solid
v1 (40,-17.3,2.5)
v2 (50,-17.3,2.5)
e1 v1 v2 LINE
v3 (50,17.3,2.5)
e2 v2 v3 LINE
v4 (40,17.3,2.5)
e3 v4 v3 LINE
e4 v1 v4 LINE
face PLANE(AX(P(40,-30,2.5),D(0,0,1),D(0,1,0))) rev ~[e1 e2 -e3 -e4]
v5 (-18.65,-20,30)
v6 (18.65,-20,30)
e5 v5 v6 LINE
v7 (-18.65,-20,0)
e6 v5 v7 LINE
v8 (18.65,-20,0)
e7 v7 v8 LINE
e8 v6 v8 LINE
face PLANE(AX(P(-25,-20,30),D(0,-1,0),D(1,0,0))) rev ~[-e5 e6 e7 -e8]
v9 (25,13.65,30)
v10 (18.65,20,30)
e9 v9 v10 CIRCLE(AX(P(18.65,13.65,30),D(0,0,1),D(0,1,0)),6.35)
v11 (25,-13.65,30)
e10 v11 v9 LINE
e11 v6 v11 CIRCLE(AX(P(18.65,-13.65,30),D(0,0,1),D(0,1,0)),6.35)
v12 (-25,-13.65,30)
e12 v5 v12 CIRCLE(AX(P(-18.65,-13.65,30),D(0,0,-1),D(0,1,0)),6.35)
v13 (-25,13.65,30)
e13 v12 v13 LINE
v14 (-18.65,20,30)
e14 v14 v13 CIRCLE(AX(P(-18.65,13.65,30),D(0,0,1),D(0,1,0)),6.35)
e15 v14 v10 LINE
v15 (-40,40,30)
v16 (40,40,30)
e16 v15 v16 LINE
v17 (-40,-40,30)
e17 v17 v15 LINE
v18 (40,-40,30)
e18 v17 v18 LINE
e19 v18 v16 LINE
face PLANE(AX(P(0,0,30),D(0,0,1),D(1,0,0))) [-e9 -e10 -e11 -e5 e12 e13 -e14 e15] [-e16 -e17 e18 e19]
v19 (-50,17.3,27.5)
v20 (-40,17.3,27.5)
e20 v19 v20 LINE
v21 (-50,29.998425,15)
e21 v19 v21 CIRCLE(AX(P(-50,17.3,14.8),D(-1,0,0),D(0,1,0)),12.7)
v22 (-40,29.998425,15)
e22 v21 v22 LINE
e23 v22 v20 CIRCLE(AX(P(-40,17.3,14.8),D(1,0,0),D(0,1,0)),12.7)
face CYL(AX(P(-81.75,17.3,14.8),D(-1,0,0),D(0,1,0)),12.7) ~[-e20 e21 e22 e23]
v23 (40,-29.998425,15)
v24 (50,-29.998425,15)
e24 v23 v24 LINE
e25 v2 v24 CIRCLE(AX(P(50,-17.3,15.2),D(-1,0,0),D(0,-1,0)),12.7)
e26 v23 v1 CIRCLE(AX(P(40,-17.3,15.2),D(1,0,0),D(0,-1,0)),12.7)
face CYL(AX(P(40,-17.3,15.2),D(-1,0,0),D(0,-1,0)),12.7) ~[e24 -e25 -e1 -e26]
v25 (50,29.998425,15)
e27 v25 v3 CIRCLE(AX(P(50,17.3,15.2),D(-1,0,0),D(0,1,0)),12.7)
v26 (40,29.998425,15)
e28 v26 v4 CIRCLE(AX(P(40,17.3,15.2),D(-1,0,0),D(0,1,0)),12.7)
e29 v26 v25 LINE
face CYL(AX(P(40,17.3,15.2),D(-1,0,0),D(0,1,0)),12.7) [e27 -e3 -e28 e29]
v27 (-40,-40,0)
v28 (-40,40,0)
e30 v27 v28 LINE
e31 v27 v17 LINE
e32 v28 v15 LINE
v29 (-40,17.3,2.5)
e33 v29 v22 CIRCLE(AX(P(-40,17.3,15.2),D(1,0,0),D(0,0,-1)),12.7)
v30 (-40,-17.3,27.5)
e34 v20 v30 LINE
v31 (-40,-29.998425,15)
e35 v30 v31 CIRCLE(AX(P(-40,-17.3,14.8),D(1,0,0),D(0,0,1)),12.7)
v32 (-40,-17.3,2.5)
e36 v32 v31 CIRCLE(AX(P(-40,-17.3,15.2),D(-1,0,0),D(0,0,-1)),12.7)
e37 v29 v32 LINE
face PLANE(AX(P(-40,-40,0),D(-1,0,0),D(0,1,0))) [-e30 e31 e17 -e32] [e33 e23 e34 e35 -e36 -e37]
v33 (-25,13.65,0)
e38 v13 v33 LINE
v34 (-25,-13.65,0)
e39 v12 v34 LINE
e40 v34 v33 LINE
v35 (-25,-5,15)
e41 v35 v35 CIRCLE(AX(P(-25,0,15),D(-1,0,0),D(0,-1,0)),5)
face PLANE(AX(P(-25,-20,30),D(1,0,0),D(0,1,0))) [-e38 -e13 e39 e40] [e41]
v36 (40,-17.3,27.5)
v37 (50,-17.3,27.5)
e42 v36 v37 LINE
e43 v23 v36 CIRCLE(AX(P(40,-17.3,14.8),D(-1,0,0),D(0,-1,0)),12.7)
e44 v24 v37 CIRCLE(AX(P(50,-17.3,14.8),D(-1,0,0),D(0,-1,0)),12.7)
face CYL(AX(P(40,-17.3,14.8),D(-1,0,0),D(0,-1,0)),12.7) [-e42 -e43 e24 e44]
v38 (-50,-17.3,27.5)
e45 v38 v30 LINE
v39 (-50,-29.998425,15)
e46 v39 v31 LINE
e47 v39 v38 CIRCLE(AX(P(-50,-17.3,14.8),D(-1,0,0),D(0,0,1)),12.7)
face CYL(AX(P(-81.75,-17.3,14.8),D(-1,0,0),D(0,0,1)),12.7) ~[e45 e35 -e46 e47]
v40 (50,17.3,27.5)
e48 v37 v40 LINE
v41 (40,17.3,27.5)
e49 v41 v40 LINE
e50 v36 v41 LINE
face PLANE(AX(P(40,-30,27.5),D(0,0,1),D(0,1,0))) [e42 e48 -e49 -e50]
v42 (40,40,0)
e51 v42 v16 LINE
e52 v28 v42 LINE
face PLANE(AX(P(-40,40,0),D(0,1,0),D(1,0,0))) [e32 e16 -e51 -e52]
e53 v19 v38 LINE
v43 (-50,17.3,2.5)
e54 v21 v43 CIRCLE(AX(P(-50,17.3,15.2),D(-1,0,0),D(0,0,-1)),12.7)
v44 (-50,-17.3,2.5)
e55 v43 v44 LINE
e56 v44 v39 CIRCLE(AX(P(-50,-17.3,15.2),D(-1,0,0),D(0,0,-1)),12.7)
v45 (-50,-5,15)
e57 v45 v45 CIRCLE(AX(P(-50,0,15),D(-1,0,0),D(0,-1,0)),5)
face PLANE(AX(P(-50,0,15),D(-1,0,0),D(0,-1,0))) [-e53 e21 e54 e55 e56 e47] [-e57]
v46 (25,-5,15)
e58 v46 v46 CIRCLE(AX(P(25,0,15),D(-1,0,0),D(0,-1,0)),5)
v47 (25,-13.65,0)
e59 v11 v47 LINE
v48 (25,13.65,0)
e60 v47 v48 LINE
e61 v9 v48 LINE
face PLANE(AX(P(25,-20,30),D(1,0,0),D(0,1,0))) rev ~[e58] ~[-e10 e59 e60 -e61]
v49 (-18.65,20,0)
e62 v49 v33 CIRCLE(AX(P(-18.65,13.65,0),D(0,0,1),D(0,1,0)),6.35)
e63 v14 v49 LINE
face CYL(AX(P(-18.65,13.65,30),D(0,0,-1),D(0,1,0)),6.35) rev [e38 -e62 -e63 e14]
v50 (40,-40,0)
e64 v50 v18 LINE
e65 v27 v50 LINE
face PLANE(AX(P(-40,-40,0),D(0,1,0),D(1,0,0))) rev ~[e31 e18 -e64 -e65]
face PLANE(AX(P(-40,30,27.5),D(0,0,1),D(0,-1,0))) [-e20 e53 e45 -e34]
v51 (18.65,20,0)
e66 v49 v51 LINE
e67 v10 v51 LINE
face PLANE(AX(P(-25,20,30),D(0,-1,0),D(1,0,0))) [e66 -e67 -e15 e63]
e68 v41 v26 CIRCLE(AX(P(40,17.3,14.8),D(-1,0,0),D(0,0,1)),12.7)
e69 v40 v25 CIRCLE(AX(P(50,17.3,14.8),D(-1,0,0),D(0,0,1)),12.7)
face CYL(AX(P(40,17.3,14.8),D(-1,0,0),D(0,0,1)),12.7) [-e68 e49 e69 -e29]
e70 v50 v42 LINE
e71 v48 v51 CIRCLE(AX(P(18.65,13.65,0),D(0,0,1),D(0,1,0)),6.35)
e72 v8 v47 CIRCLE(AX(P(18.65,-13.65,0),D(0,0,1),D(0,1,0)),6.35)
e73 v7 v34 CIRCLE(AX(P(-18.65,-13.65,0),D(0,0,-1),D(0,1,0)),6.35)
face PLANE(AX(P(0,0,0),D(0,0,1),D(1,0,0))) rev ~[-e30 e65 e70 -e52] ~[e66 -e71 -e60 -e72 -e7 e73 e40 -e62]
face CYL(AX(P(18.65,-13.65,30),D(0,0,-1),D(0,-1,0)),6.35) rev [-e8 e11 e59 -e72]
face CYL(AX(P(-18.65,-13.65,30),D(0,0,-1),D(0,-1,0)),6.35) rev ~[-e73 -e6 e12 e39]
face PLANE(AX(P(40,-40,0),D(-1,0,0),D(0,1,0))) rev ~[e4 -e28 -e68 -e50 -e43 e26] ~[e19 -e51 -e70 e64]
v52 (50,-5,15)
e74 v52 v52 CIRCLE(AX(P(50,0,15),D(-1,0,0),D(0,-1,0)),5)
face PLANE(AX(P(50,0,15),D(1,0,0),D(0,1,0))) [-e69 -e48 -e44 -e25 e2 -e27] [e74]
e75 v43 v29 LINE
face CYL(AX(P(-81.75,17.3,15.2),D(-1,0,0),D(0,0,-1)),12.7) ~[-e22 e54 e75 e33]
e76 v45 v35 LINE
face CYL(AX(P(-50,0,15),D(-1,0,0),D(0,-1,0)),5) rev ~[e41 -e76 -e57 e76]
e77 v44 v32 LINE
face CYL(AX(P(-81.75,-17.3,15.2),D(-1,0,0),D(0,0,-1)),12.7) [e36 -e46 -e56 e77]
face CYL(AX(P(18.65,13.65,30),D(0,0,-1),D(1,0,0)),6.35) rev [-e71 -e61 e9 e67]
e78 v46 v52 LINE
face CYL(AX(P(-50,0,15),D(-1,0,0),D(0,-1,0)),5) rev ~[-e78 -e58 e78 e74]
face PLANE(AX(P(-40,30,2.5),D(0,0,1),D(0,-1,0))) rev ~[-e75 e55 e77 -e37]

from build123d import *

# Parameters (mm, degrees)
F0_W         = 80
F0_H         = 80
F1_DEPTH     = 30
F2_W         = 60
F2_H         = 25
F3_DEPTH     = 10
F4_W         = 60
F4_H         = 25
F5_DEPTH     = 10
F6_R         = 5
F7_DEPTH     = 100.001
F8_W         = 50
F8_H         = 40
F9_DEPTH     = 30.001
F10_R        = 6.35
F11_T1_DEPTH = 41.75
F11_T3_DEPTH = 41.75


# Not quite as in the source:
# - a fillet or chamfer that OpenCascade refuses, or shapes differently, is made with other operations: its cross-section is extruded or revolved along the edge and cut away or added


with BuildPart() as f1:
    # F0 (on Top) → F1 (new body)
    with BuildSketch(Plane.XY):
        Rectangle(F0_W, F0_H)
    extrude(amount=F1_DEPTH)

    # F2 (on face) → F3 (join)
    with BuildSketch(Plane(origin=(-40, 0, 0), x_dir=(0, -1, 0), z_dir=(-1, 0, 0))):
        with Locations((0, 15)):
            Rectangle(F2_W, F2_H)
    extrude(amount=F3_DEPTH)

    # F4 (on face) → F5 (join)
    with BuildSketch(Plane.YZ.offset(40)):
        with Locations((0, 15)):
            Rectangle(F4_W, F4_H)
    extrude(amount=F5_DEPTH)

    # F6 (on face) → F7 (cut, through all)
    with BuildSketch(Plane(origin=(-50, 0, 0), x_dir=(0, -1, 0), z_dir=(-1, 0, 0))):
        with Locations((0, 15)):
            Circle(F6_R)
    extrude(amount=-F7_DEPTH, mode=Mode.SUBTRACT)

    # F8 (on face) → F9 (cut, through all)
    with BuildSketch(Plane.XY.offset(30)):
        Rectangle(F8_W, F8_H)
    extrude(amount=-F9_DEPTH, mode=Mode.SUBTRACT)

    # F10
    f10_edges = [f1.edges().sort_by_distance(p)[0] for p in [
        (-25, 20, 15),
        (25, 20, 15),
        (25, -20, 15),
        (-25, -20, 15),
    ]]
    fillet(f10_edges, radius=F10_R)

    # F11: fillet of radius 12.7 on 8 edges, made by hand

    # F11_s2 → F11_t1 (cut)
    with BuildSketch(Plane.YZ.offset(40)):
        with BuildLine():
            ThreePointArc((-30, 14.8), (-26.2802561211, 23.7802561211), (-17.3, 27.5))
            Line((-17.3, 27.5), (-30, 27.5))
            Line((-30, 27.5), (-30, 14.8))
        make_face()
        with BuildLine():
            ThreePointArc((-30, 15.2), (-26.2802561211, 6.2197438789), (-17.3, 2.5))
            Line((-17.3, 2.5), (-30, 2.5))
            Line((-30, 2.5), (-30, 15.2))
        make_face()
        with BuildLine():
            ThreePointArc((30, 15.2), (26.2802561211, 6.2197438789), (17.3, 2.5))
            Line((17.3, 2.5), (30, 2.5))
            Line((30, 2.5), (30, 15.2))
        make_face()
        with BuildLine():
            ThreePointArc((17.3, 27.5), (26.2802561211, 23.7802561211), (30, 14.8))
            Line((30, 14.8), (30, 27.5))
            Line((30, 27.5), (17.3, 27.5))
        make_face()
    extrude(amount=F11_T1_DEPTH, mode=Mode.SUBTRACT)

    # F11_s4 → F11_t3 (cut)
    with BuildSketch(Plane.YZ.offset(-81.75)):
        with BuildLine():
            ThreePointArc((17.3, 2.5), (26.2802561211, 6.2197438789), (30, 15.2))
            Line((30, 15.2), (30, 2.5))
            Line((30, 2.5), (17.3, 2.5))
        make_face()
        with BuildLine():
            ThreePointArc((-17.3, 2.5), (-26.2802561211, 6.2197438789), (-30, 15.2))
            Line((-30, 15.2), (-30, 2.5))
            Line((-30, 2.5), (-17.3, 2.5))
        make_face()
        with BuildLine():
            ThreePointArc((-17.3, 27.5), (-26.2802561211, 23.7802561211), (-30, 14.8))
            Line((-30, 14.8), (-30, 27.5))
            Line((-30, 27.5), (-17.3, 27.5))
        make_face()
        with BuildLine():
            ThreePointArc((30, 14.8), (26.2802561211, 23.7802561211), (17.3, 27.5))
            Line((17.3, 27.5), (30, 27.5))
            Line((30, 27.5), (30, 14.8))
        make_face()
    extrude(amount=F11_T3_DEPTH, mode=Mode.SUBTRACT)


solid = f1.part
